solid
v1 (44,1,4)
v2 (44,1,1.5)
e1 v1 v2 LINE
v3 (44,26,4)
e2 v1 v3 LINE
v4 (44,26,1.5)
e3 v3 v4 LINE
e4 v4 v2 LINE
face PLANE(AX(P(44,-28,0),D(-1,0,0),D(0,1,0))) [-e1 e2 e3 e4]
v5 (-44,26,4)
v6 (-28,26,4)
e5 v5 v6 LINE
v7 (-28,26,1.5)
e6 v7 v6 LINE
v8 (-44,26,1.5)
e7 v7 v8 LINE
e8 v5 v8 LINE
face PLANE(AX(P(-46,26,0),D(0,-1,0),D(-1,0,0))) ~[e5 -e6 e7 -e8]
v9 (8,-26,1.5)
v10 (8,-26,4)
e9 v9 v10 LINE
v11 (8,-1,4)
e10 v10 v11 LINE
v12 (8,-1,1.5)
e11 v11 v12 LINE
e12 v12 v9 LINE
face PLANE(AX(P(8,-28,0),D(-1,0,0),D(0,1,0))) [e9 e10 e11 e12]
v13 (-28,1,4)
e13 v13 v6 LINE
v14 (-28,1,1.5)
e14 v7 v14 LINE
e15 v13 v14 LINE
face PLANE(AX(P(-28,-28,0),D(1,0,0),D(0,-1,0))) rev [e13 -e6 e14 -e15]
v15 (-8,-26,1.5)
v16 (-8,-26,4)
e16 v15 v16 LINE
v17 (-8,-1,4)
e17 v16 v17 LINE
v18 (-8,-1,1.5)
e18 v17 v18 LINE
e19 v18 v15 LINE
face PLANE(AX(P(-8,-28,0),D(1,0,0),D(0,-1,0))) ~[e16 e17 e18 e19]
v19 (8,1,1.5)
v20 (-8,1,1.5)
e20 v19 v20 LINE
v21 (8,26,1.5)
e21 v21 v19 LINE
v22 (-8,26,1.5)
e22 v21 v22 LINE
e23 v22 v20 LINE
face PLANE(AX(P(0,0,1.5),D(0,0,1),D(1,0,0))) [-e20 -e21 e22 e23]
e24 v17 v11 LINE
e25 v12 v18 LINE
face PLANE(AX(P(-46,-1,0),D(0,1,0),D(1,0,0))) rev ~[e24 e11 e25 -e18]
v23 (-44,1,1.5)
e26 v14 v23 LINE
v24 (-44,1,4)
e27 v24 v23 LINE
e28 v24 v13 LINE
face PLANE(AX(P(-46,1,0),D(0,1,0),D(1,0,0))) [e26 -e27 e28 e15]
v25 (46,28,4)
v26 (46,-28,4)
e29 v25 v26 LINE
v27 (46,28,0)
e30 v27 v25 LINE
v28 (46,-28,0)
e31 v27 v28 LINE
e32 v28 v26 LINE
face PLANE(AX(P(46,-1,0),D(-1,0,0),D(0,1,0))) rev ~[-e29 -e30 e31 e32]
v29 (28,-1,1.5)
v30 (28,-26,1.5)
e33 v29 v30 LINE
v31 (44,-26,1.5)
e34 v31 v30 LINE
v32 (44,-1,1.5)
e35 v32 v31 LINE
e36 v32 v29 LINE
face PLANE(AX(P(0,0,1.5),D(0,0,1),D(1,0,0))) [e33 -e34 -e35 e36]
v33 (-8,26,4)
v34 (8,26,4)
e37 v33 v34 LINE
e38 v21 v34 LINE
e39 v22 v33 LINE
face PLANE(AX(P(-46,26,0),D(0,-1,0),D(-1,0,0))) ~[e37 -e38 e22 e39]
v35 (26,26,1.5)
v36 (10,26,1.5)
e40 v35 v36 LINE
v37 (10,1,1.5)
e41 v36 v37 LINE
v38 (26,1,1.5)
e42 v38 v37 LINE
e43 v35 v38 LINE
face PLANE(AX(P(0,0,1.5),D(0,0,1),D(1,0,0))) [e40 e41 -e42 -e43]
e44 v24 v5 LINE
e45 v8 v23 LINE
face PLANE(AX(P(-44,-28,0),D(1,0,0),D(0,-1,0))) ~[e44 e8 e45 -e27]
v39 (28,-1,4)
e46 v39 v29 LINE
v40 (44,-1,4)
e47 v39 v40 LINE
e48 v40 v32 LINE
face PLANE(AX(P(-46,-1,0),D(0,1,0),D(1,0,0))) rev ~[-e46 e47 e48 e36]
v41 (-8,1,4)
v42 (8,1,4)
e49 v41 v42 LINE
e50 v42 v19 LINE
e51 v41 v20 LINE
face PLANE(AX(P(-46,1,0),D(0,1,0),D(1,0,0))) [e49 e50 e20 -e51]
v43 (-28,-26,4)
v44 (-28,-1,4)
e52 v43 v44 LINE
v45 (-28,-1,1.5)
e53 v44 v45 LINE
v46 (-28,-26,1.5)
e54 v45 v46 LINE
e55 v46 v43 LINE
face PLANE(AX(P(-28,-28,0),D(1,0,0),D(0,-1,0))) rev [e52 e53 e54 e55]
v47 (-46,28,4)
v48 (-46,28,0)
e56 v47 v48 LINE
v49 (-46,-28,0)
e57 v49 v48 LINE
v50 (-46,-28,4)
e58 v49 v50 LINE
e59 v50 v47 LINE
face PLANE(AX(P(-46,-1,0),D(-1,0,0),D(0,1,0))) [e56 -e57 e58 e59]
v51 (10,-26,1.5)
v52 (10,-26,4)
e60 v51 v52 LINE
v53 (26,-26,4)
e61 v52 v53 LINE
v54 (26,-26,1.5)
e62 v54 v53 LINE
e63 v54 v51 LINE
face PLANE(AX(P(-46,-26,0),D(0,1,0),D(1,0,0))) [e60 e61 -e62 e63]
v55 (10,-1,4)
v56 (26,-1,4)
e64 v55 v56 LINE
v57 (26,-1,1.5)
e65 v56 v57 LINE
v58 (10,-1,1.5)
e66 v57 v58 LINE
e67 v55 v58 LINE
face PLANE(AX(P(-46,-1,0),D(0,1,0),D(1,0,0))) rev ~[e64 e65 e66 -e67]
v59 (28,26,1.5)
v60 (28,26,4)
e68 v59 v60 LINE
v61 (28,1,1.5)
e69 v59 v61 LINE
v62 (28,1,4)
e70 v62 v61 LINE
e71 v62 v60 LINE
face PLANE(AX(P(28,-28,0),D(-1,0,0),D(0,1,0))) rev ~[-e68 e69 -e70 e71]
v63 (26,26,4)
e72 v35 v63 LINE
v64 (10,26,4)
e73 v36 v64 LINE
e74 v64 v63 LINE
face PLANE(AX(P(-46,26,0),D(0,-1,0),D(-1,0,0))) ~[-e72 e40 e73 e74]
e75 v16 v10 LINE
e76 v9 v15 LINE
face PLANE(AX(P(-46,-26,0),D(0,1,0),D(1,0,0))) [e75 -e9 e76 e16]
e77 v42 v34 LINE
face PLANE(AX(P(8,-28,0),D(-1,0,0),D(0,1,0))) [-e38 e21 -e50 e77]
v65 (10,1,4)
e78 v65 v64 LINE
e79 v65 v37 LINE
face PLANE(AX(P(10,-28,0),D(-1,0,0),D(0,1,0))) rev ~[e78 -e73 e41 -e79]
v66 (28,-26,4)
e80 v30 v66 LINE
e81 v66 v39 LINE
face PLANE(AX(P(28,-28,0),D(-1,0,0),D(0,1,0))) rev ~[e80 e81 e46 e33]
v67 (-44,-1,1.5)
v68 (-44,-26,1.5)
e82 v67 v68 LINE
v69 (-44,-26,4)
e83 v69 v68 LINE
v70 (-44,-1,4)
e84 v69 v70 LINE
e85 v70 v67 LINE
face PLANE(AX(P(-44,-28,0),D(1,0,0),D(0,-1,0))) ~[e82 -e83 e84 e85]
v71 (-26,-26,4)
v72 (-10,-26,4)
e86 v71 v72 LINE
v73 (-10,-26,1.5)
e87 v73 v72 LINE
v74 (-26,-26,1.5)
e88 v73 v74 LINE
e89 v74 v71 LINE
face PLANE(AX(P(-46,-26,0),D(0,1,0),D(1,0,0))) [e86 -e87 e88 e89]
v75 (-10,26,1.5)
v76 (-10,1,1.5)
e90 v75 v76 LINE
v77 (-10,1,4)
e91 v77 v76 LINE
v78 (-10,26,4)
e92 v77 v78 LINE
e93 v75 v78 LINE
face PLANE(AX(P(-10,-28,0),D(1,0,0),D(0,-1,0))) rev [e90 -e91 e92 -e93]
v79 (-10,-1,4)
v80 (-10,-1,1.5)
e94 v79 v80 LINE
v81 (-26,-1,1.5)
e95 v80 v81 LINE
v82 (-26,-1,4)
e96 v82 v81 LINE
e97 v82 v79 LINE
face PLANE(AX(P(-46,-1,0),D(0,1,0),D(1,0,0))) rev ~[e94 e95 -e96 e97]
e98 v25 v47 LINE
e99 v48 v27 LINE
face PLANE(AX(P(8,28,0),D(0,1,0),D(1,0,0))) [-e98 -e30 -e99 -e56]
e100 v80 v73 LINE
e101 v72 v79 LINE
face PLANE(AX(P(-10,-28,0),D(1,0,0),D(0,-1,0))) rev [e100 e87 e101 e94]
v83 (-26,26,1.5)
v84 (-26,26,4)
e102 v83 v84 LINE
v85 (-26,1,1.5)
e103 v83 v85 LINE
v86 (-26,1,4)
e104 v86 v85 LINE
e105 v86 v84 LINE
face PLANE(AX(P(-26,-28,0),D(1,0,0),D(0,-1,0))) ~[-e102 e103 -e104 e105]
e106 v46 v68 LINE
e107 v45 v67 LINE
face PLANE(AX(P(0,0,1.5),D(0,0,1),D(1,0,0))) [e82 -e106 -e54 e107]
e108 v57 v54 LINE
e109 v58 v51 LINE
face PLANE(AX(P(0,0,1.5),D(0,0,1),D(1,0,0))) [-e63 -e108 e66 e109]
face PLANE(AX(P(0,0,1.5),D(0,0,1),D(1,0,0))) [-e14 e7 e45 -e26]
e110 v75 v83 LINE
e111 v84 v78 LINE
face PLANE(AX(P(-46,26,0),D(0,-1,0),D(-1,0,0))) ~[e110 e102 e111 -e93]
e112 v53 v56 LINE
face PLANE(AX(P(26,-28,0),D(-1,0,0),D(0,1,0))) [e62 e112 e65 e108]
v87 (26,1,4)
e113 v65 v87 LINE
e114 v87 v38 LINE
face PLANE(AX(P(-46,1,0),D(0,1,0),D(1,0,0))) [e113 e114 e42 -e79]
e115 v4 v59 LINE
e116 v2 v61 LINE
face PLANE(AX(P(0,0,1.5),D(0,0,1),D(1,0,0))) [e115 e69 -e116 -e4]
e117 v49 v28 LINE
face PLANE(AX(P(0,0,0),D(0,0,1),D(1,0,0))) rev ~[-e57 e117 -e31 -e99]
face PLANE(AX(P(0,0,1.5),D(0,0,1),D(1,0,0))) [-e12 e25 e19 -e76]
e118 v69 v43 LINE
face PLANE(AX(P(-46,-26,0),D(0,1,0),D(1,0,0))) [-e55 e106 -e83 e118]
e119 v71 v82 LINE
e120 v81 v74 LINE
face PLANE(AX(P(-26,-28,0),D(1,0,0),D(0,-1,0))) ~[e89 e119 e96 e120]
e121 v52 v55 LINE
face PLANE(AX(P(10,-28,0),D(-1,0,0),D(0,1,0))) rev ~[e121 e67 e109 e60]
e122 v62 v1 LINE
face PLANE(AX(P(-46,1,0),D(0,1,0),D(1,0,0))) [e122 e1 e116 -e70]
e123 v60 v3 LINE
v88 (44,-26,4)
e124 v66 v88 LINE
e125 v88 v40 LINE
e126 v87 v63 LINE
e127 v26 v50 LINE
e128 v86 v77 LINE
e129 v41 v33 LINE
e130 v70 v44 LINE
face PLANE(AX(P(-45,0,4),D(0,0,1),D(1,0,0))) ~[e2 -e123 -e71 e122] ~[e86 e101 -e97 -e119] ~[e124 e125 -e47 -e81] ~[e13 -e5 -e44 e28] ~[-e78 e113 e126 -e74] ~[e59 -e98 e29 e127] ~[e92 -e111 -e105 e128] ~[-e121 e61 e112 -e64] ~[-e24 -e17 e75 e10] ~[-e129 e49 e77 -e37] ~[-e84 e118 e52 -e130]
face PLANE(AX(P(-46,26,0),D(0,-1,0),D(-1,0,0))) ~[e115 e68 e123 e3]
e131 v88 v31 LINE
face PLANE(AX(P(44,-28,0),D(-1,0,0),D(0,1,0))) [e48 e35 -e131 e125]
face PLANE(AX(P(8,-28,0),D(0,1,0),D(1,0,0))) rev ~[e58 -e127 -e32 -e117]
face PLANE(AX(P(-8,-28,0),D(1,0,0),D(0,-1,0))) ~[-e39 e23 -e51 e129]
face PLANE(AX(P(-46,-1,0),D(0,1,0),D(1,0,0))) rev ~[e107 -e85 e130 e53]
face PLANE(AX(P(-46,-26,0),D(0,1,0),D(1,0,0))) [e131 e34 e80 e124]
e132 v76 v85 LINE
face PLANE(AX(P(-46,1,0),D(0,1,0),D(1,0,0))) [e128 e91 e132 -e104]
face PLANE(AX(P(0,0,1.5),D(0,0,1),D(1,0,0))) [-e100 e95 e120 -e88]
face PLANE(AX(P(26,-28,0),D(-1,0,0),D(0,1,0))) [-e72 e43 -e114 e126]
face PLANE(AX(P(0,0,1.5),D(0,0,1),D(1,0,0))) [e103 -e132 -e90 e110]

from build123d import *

# Parameters (mm, degrees)
F0_W      = 92
F0_H      = 56
F1_DEPTH  = 1.5
F2_W      = 2
F2_H      = 56
F3_DEPTH  = 4
F5_W      = 92
F5_H      = 2
F6_DEPTH  = 4
F8_W      = 2
F8_H      = 56
F9_DEPTH  = 4
F11_W     = 2
F11_H     = 56
F12_DEPTH = 4
F14_W     = 92
F14_H     = 2
F15_DEPTH = 4


# Not quite as in the source:
# - a feature names something its author has since deleted; it is built from what else it names


with BuildPart() as f1:
    # F0 (on Top) → F1 (new body)
    with BuildSketch(Plane.XY):
        Rectangle(F0_W, F0_H)
    extrude(amount=F1_DEPTH)

    # F4: F3 across plane


with BuildPart() as f3:
    # F2 (on Top) → F3 (new body)
    with BuildSketch(Plane.XY):
        with Locations((45, 0)):
            Rectangle(F2_W, F2_H)
    extrude(amount=F3_DEPTH)


with BuildPart() as f1_1:
    add(f1.part)
    add(f3.part.mirror(Plane.YZ))


    add(f3.part)  # F6 merges F3
    # F5 (on Top) → F6 (join)
    with BuildSketch(Plane.XY):
        with Locations((0, -27)):
            Rectangle(F5_W, F5_H)
    extrude(amount=F6_DEPTH)

    # F7: F1 across plane


with BuildPart() as f1_2:
    add(f1_1.part)
    add(f1_1.part.mirror(Plane.XZ))

    # F8 (on Top) → F9 (join)
    with BuildSketch(Plane.XY):
        with Locations((27, 0)):
            Rectangle(F8_W, F8_H)
    extrude(amount=F9_DEPTH)

    # F10: F1 across plane


with BuildPart() as f1_3:
    add(f1_2.part)
    add(f1_2.part.mirror(Plane.YZ))

    # F11 (on Top) → F12 (join)
    with BuildSketch(Plane.XY):
        with Locations((9, 0)):
            Rectangle(F11_W, F11_H)
    extrude(amount=F12_DEPTH)

    # F13: F1 across plane


with BuildPart() as f1_4:
    add(f1_3.part)
    add(f1_3.part.mirror(Plane.YZ))

    # F14 (on Top) → F15 (join)
    with BuildSketch(Plane.XY):
        Rectangle(F14_W, F14_H)
    extrude(amount=F15_DEPTH)


solid = f1_4.part
